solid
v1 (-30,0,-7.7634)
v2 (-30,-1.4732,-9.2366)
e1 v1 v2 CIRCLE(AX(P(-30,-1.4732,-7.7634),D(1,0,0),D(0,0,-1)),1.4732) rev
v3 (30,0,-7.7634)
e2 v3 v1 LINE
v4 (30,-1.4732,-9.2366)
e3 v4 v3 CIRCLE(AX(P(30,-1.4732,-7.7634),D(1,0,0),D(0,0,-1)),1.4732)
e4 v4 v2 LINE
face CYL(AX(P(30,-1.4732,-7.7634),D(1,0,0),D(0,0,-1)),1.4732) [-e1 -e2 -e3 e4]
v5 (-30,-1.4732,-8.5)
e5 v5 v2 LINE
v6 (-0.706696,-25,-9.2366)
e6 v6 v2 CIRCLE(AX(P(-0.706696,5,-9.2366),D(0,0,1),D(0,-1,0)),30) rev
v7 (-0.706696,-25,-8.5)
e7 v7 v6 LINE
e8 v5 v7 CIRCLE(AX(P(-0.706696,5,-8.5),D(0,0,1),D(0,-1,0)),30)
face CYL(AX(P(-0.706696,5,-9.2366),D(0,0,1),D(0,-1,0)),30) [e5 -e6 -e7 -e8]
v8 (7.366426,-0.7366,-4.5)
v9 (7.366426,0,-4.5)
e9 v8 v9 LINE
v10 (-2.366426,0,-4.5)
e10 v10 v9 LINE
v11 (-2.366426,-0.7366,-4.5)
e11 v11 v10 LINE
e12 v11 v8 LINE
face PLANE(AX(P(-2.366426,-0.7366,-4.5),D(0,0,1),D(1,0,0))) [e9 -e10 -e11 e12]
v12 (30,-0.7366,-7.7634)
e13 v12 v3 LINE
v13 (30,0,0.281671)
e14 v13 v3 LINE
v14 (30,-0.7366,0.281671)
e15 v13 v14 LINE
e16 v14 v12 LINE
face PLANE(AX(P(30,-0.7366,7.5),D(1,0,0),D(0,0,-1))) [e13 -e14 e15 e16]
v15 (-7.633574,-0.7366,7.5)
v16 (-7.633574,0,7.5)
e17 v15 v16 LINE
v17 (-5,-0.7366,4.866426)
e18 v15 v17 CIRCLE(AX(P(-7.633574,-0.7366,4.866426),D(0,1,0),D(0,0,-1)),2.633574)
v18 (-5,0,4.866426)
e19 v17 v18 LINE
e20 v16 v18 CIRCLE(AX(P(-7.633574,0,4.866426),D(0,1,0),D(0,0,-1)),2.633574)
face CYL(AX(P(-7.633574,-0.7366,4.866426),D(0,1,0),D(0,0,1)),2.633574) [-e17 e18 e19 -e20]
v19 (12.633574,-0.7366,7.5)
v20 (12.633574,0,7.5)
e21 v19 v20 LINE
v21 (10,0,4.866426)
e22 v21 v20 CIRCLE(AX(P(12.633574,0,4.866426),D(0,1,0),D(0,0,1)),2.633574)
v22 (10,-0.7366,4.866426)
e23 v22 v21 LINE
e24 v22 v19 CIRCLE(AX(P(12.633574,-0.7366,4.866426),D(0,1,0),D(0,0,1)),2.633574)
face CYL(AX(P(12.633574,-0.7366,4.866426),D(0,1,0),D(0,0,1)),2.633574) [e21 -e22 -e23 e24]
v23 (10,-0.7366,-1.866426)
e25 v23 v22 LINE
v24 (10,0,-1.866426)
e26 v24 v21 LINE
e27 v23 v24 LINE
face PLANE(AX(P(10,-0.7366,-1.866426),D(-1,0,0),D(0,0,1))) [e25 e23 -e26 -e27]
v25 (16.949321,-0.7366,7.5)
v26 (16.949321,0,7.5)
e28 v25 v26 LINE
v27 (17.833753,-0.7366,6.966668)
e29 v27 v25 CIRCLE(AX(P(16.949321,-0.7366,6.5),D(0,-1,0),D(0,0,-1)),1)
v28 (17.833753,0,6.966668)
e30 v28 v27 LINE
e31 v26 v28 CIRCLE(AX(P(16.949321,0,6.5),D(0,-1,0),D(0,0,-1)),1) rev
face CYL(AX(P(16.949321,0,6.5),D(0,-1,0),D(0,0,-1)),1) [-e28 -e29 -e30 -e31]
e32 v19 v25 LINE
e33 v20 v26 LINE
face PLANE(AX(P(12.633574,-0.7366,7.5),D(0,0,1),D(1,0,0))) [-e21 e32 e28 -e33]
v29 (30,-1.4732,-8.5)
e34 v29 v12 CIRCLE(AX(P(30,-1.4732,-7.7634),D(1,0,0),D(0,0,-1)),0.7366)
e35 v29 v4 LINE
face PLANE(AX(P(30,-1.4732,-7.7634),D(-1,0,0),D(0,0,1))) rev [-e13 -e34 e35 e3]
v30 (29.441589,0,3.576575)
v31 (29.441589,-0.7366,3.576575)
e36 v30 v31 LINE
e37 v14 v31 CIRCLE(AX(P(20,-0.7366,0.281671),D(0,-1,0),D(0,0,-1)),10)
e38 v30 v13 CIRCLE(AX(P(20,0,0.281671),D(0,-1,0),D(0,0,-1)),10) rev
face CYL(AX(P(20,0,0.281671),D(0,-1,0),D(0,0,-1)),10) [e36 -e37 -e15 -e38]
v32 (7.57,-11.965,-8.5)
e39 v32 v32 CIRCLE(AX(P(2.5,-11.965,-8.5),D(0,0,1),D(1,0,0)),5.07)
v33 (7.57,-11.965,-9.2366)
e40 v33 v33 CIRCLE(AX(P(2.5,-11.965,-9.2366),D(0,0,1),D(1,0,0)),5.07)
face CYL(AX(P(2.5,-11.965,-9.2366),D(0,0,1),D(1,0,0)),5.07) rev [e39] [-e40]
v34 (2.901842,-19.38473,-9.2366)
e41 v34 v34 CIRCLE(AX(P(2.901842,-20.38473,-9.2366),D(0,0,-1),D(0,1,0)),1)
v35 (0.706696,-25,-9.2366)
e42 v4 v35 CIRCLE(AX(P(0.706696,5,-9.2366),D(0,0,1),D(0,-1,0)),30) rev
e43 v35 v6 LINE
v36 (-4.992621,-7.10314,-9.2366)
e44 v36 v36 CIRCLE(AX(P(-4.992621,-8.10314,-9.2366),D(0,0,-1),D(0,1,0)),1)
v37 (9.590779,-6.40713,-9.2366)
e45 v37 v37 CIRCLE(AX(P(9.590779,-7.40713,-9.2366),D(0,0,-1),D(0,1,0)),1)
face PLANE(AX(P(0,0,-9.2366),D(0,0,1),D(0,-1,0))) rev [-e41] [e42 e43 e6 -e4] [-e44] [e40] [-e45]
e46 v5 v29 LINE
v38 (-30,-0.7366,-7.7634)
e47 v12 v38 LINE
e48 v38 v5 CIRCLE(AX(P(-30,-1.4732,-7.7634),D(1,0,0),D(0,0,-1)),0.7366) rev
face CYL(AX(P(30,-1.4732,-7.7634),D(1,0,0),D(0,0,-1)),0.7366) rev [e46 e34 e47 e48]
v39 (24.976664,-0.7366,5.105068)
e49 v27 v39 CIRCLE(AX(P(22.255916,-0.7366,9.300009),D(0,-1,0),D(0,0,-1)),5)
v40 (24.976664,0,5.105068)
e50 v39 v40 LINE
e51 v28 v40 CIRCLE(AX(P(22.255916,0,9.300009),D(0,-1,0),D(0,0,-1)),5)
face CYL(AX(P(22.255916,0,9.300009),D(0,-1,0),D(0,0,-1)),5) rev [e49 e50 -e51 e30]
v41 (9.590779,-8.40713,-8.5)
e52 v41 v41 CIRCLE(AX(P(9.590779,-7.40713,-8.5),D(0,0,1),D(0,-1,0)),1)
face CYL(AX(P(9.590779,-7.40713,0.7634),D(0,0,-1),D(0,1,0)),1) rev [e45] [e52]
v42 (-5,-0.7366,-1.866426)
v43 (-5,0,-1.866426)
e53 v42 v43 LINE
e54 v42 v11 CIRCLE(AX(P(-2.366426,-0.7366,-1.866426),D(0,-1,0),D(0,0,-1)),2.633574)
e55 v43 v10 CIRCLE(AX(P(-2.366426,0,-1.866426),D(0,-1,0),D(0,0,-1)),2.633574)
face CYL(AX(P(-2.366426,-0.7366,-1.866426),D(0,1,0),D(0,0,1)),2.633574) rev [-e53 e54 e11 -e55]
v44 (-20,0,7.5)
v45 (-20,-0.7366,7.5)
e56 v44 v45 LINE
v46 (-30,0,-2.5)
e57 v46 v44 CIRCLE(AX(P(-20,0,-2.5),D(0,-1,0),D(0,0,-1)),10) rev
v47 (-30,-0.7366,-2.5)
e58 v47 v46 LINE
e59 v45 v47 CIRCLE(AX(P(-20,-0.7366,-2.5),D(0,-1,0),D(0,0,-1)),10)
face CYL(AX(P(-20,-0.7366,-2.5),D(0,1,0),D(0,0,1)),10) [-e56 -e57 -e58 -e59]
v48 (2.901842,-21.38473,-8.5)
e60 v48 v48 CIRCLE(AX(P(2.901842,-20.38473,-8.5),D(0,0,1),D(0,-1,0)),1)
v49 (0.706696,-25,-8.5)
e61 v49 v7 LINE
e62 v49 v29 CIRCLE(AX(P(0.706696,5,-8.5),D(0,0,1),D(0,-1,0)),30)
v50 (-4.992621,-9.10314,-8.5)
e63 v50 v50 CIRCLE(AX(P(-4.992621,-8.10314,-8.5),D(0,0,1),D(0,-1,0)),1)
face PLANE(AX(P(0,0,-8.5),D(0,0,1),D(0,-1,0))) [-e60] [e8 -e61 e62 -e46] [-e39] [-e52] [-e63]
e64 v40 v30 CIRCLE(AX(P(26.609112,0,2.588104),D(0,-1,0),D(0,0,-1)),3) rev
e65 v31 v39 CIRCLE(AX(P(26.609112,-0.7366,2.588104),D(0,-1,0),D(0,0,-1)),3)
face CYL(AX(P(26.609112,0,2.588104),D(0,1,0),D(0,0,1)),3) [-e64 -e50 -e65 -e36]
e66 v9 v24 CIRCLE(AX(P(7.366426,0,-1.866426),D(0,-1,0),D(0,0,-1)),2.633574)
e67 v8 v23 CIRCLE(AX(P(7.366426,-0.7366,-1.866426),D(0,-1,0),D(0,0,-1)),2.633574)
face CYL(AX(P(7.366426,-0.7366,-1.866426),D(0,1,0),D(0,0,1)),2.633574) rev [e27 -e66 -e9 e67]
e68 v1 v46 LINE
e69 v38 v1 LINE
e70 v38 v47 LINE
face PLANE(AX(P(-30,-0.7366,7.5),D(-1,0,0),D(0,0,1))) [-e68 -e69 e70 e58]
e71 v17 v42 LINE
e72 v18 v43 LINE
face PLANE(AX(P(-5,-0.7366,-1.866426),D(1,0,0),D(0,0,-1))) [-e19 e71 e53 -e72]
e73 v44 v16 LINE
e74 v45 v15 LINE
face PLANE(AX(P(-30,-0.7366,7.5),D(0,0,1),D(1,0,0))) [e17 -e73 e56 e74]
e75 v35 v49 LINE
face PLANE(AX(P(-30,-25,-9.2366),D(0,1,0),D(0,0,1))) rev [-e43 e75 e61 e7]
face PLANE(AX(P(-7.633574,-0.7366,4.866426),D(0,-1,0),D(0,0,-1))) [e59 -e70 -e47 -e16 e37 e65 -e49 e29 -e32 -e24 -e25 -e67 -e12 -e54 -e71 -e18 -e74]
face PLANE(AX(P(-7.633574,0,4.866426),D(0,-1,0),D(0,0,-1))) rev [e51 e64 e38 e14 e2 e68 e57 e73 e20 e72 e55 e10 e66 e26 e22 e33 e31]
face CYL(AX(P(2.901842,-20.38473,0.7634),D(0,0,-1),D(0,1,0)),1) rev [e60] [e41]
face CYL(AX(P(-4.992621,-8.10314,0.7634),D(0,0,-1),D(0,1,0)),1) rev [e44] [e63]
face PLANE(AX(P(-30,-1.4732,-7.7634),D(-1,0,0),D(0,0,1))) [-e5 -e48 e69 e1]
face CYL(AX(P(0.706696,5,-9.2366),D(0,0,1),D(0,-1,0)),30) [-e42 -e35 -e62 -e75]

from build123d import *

# Parameters (mm, degrees)
BASE_FLANGE1_DEPTH = 0.7366
EDGE_FLANGE1_DEPTH = 60
SKETCH10_R         = 1
CUT_EXTRUDE1_DEPTH = 10
SKETCH11_R         = 4.999999998
CUT_EXTRUDE2_DEPTH = 10
FILLET1_START      = -9.2366
FILLET1_DEPTH      = 0.7366
FILLET2_R          = 10
FILLET3_R          = 10
FILLET4_R          = 3
FILLET5_R          = 1
SKETCH14_R         = 5.07
SKETCH14_R_2       = 4.97
CUT_EXTRUDE4_DEPTH = 0.7366


with BuildPart() as part:
    # Base-Flange1: sheet metal written as solids
    # Sketch2 → Base-Flange1 (new body)
    with BuildSketch(Plane(origin=(0, 0, 0), x_dir=(1, 0, 0), z_dir=(0, 1, 0))):
        with BuildLine():
            Line((-2.36642583, 4.5), (7.36642583, 4.5))
            ThreePointArc((7.36642583, 4.5), (9.228643984, 3.728643984), (10, 1.86642583))
            Line((10, 1.86642583), (10, -4.86642583))
            ThreePointArc((10, -4.86642583), (10.771356016, -6.728643984), (12.63357417, -7.5))
            Line((12.63357417, -7.5), (30, -7.5))
            Line((30, -7.5), (30, 7.5))
            Line((30, 7.5), (-30, 7.5))
            Line((-30, 7.5), (-30, -7.5))
            Line((-30, -7.5), (-7.63357417, -7.5))
            ThreePointArc((-7.63357417, -7.5), (-5.771356016, -6.728643984), (-5, -4.86642583))
            Line((-5, -4.86642583), (-5, 1.86642583))
            ThreePointArc((-5, 1.86642583), (-4.228643984, 3.728643984), (-2.36642583, 4.5))
        make_face()
    extrude(amount=-BASE_FLANGE1_DEPTH)

    # Edge-Flange1: sheet metal written as solids
    # Edge-Flange1 section (on a plane across the edge) → Edge-Flange1 (add)
    with BuildSketch(Plane(origin=(-30, -0.7366, -8.5), x_dir=(0, 0, 1), z_dir=(1, 0, 0))):
        with BuildLine():
            Line((-0.7366, 0.7366), (-0.7366, 24.2634))
            Line((-0.7366, 24.2634), (0, 24.2634))
            Line((0, 24.2634), (0, 0.7366))
            ThreePointArc((0, 0.7366), (0.215745145, 0.215745145), (0.7366, 0))
            Line((0.7366, 0), (1, 0))
            Line((1, 0), (1, -0.7366))
            Line((1, -0.7366), (0.7366, -0.7366))
            ThreePointArc((0.7366, -0.7366), (-0.30510971, -0.30510971), (-0.7366, 0.7366))
        make_face()
    extrude(amount=EDGE_FLANGE1_DEPTH)

    # Sketch10 → Cut-Extrude1 (cut)
    with BuildSketch(Plane(origin=(0, 0, -9.2366), x_dir=(-1, 0, 0), z_dir=(0, 0, -1))):
        with Locations(Location((-9.590779371, -7.407129747, 0), (0, 0, 90))):
            Circle(SKETCH10_R)
        with Locations(Location((4.992621112, -8.103140058, 0), (0, 0, 90))):
            Circle(SKETCH10_R)
        with Locations(Location((-2.90184174, -20.384730194, 0), (0, 0, 90))):
            Circle(SKETCH10_R)
    extrude(amount=-CUT_EXTRUDE1_DEPTH, mode=Mode.SUBTRACT)

    # Sketch11 → Cut-Extrude2 (cut)
    with BuildSketch(Plane.XZ.offset(0.7366)):
        with Locations((22.255915642, 9.300009257)):
            Circle(SKETCH11_R)
    extrude(amount=-CUT_EXTRUDE2_DEPTH, mode=Mode.SUBTRACT)

    # Fillet1: read off the stored shape, not the designer's step
    # Fillet1 outline → Fillet1 (cut)
    with BuildSketch(Plane.XY.offset(FILLET1_START)):
        with BuildLine():
            ThreePointArc((30, -1.4732), (19.492381656, -18.390126122), (0.706695616, -25))
            Line((0.706695616, -25), (30, -25))
            Line((30, -25), (30, -1.4732))
        make_face()
        with BuildLine():
            ThreePointArc((-0.706695616, -25), (-19.492381656, -18.390126122), (-30, -1.4732))
            Line((-30, -1.4732), (-30, -25))
            Line((-30, -25), (-0.706695616, -25))
        make_face()
    extrude(amount=FILLET1_DEPTH, mode=Mode.SUBTRACT)

    # Fillet2
    fillet2_edges = [part.edges().sort_by_distance(p)[0] for p in [
        (-30, -0.3683, 7.5),
    ]]
    fillet(fillet2_edges, radius=FILLET2_R)

    # Fillet3
    # the kernel refuses this fillet: 10 mm, written as the material it takes off along each edge
    with BuildSketch(Plane(origin=(30, 18.045823122, 7.5), x_dir=(0, 0, -1), z_dir=(0, -1, 0))) as fillet3_piece_1:
        with BuildLine():
            CenterArc((7.218329249, -10), FILLET3_R, 90, 46.206018187)
            Line((0, -3.079326416), (-0.144366585, -2.940912944))
            ThreePointArc((-0.144366585, -2.940912944), (-0.2, -1.539663208), (-0.2, 0))
            Line((-0.2, 0), (0, 0.2))
            Line((0, 0.2), (7.218329249, 0.2))
            Line((7.218329249, 0.2), (7.218329249, 0))
        make_face()
    extrude(amount=36.828246244, mode=Mode.SUBTRACT)

    # Fillet4
    fillet4_edges = [part.edges().sort_by_distance(p)[0] for p in [
        (26.920673584, -0.3683, 7.5),
    ]]
    fillet(fillet4_edges, radius=FILLET4_R)

    # Fillet5
    fillet5_edges = [part.edges().sort_by_distance(p)[0] for p in [
        (17.5911577, -0.3683, 7.5),
    ]]
    fillet(fillet5_edges, radius=FILLET5_R)

    # Sketch14 → Cut-Extrude4 (cut)
    # profile 1 of 2: a face of its own
    with BuildSketch(Plane.XY.offset(-8.5)):
        with Locations((2.5, -11.965)):
            Circle(SKETCH14_R)
        with Locations((2.5, -11.965)):
            Circle(SKETCH14_R_2, mode=Mode.SUBTRACT)
    # profile 2 of 2: a face of its own
    with BuildSketch(Plane.XY.offset(-8.5)):
        with Locations((2.5, -11.965)):
            Circle(SKETCH14_R_2)
    extrude(amount=-CUT_EXTRUDE4_DEPTH, mode=Mode.SUBTRACT)


solid = part.part
